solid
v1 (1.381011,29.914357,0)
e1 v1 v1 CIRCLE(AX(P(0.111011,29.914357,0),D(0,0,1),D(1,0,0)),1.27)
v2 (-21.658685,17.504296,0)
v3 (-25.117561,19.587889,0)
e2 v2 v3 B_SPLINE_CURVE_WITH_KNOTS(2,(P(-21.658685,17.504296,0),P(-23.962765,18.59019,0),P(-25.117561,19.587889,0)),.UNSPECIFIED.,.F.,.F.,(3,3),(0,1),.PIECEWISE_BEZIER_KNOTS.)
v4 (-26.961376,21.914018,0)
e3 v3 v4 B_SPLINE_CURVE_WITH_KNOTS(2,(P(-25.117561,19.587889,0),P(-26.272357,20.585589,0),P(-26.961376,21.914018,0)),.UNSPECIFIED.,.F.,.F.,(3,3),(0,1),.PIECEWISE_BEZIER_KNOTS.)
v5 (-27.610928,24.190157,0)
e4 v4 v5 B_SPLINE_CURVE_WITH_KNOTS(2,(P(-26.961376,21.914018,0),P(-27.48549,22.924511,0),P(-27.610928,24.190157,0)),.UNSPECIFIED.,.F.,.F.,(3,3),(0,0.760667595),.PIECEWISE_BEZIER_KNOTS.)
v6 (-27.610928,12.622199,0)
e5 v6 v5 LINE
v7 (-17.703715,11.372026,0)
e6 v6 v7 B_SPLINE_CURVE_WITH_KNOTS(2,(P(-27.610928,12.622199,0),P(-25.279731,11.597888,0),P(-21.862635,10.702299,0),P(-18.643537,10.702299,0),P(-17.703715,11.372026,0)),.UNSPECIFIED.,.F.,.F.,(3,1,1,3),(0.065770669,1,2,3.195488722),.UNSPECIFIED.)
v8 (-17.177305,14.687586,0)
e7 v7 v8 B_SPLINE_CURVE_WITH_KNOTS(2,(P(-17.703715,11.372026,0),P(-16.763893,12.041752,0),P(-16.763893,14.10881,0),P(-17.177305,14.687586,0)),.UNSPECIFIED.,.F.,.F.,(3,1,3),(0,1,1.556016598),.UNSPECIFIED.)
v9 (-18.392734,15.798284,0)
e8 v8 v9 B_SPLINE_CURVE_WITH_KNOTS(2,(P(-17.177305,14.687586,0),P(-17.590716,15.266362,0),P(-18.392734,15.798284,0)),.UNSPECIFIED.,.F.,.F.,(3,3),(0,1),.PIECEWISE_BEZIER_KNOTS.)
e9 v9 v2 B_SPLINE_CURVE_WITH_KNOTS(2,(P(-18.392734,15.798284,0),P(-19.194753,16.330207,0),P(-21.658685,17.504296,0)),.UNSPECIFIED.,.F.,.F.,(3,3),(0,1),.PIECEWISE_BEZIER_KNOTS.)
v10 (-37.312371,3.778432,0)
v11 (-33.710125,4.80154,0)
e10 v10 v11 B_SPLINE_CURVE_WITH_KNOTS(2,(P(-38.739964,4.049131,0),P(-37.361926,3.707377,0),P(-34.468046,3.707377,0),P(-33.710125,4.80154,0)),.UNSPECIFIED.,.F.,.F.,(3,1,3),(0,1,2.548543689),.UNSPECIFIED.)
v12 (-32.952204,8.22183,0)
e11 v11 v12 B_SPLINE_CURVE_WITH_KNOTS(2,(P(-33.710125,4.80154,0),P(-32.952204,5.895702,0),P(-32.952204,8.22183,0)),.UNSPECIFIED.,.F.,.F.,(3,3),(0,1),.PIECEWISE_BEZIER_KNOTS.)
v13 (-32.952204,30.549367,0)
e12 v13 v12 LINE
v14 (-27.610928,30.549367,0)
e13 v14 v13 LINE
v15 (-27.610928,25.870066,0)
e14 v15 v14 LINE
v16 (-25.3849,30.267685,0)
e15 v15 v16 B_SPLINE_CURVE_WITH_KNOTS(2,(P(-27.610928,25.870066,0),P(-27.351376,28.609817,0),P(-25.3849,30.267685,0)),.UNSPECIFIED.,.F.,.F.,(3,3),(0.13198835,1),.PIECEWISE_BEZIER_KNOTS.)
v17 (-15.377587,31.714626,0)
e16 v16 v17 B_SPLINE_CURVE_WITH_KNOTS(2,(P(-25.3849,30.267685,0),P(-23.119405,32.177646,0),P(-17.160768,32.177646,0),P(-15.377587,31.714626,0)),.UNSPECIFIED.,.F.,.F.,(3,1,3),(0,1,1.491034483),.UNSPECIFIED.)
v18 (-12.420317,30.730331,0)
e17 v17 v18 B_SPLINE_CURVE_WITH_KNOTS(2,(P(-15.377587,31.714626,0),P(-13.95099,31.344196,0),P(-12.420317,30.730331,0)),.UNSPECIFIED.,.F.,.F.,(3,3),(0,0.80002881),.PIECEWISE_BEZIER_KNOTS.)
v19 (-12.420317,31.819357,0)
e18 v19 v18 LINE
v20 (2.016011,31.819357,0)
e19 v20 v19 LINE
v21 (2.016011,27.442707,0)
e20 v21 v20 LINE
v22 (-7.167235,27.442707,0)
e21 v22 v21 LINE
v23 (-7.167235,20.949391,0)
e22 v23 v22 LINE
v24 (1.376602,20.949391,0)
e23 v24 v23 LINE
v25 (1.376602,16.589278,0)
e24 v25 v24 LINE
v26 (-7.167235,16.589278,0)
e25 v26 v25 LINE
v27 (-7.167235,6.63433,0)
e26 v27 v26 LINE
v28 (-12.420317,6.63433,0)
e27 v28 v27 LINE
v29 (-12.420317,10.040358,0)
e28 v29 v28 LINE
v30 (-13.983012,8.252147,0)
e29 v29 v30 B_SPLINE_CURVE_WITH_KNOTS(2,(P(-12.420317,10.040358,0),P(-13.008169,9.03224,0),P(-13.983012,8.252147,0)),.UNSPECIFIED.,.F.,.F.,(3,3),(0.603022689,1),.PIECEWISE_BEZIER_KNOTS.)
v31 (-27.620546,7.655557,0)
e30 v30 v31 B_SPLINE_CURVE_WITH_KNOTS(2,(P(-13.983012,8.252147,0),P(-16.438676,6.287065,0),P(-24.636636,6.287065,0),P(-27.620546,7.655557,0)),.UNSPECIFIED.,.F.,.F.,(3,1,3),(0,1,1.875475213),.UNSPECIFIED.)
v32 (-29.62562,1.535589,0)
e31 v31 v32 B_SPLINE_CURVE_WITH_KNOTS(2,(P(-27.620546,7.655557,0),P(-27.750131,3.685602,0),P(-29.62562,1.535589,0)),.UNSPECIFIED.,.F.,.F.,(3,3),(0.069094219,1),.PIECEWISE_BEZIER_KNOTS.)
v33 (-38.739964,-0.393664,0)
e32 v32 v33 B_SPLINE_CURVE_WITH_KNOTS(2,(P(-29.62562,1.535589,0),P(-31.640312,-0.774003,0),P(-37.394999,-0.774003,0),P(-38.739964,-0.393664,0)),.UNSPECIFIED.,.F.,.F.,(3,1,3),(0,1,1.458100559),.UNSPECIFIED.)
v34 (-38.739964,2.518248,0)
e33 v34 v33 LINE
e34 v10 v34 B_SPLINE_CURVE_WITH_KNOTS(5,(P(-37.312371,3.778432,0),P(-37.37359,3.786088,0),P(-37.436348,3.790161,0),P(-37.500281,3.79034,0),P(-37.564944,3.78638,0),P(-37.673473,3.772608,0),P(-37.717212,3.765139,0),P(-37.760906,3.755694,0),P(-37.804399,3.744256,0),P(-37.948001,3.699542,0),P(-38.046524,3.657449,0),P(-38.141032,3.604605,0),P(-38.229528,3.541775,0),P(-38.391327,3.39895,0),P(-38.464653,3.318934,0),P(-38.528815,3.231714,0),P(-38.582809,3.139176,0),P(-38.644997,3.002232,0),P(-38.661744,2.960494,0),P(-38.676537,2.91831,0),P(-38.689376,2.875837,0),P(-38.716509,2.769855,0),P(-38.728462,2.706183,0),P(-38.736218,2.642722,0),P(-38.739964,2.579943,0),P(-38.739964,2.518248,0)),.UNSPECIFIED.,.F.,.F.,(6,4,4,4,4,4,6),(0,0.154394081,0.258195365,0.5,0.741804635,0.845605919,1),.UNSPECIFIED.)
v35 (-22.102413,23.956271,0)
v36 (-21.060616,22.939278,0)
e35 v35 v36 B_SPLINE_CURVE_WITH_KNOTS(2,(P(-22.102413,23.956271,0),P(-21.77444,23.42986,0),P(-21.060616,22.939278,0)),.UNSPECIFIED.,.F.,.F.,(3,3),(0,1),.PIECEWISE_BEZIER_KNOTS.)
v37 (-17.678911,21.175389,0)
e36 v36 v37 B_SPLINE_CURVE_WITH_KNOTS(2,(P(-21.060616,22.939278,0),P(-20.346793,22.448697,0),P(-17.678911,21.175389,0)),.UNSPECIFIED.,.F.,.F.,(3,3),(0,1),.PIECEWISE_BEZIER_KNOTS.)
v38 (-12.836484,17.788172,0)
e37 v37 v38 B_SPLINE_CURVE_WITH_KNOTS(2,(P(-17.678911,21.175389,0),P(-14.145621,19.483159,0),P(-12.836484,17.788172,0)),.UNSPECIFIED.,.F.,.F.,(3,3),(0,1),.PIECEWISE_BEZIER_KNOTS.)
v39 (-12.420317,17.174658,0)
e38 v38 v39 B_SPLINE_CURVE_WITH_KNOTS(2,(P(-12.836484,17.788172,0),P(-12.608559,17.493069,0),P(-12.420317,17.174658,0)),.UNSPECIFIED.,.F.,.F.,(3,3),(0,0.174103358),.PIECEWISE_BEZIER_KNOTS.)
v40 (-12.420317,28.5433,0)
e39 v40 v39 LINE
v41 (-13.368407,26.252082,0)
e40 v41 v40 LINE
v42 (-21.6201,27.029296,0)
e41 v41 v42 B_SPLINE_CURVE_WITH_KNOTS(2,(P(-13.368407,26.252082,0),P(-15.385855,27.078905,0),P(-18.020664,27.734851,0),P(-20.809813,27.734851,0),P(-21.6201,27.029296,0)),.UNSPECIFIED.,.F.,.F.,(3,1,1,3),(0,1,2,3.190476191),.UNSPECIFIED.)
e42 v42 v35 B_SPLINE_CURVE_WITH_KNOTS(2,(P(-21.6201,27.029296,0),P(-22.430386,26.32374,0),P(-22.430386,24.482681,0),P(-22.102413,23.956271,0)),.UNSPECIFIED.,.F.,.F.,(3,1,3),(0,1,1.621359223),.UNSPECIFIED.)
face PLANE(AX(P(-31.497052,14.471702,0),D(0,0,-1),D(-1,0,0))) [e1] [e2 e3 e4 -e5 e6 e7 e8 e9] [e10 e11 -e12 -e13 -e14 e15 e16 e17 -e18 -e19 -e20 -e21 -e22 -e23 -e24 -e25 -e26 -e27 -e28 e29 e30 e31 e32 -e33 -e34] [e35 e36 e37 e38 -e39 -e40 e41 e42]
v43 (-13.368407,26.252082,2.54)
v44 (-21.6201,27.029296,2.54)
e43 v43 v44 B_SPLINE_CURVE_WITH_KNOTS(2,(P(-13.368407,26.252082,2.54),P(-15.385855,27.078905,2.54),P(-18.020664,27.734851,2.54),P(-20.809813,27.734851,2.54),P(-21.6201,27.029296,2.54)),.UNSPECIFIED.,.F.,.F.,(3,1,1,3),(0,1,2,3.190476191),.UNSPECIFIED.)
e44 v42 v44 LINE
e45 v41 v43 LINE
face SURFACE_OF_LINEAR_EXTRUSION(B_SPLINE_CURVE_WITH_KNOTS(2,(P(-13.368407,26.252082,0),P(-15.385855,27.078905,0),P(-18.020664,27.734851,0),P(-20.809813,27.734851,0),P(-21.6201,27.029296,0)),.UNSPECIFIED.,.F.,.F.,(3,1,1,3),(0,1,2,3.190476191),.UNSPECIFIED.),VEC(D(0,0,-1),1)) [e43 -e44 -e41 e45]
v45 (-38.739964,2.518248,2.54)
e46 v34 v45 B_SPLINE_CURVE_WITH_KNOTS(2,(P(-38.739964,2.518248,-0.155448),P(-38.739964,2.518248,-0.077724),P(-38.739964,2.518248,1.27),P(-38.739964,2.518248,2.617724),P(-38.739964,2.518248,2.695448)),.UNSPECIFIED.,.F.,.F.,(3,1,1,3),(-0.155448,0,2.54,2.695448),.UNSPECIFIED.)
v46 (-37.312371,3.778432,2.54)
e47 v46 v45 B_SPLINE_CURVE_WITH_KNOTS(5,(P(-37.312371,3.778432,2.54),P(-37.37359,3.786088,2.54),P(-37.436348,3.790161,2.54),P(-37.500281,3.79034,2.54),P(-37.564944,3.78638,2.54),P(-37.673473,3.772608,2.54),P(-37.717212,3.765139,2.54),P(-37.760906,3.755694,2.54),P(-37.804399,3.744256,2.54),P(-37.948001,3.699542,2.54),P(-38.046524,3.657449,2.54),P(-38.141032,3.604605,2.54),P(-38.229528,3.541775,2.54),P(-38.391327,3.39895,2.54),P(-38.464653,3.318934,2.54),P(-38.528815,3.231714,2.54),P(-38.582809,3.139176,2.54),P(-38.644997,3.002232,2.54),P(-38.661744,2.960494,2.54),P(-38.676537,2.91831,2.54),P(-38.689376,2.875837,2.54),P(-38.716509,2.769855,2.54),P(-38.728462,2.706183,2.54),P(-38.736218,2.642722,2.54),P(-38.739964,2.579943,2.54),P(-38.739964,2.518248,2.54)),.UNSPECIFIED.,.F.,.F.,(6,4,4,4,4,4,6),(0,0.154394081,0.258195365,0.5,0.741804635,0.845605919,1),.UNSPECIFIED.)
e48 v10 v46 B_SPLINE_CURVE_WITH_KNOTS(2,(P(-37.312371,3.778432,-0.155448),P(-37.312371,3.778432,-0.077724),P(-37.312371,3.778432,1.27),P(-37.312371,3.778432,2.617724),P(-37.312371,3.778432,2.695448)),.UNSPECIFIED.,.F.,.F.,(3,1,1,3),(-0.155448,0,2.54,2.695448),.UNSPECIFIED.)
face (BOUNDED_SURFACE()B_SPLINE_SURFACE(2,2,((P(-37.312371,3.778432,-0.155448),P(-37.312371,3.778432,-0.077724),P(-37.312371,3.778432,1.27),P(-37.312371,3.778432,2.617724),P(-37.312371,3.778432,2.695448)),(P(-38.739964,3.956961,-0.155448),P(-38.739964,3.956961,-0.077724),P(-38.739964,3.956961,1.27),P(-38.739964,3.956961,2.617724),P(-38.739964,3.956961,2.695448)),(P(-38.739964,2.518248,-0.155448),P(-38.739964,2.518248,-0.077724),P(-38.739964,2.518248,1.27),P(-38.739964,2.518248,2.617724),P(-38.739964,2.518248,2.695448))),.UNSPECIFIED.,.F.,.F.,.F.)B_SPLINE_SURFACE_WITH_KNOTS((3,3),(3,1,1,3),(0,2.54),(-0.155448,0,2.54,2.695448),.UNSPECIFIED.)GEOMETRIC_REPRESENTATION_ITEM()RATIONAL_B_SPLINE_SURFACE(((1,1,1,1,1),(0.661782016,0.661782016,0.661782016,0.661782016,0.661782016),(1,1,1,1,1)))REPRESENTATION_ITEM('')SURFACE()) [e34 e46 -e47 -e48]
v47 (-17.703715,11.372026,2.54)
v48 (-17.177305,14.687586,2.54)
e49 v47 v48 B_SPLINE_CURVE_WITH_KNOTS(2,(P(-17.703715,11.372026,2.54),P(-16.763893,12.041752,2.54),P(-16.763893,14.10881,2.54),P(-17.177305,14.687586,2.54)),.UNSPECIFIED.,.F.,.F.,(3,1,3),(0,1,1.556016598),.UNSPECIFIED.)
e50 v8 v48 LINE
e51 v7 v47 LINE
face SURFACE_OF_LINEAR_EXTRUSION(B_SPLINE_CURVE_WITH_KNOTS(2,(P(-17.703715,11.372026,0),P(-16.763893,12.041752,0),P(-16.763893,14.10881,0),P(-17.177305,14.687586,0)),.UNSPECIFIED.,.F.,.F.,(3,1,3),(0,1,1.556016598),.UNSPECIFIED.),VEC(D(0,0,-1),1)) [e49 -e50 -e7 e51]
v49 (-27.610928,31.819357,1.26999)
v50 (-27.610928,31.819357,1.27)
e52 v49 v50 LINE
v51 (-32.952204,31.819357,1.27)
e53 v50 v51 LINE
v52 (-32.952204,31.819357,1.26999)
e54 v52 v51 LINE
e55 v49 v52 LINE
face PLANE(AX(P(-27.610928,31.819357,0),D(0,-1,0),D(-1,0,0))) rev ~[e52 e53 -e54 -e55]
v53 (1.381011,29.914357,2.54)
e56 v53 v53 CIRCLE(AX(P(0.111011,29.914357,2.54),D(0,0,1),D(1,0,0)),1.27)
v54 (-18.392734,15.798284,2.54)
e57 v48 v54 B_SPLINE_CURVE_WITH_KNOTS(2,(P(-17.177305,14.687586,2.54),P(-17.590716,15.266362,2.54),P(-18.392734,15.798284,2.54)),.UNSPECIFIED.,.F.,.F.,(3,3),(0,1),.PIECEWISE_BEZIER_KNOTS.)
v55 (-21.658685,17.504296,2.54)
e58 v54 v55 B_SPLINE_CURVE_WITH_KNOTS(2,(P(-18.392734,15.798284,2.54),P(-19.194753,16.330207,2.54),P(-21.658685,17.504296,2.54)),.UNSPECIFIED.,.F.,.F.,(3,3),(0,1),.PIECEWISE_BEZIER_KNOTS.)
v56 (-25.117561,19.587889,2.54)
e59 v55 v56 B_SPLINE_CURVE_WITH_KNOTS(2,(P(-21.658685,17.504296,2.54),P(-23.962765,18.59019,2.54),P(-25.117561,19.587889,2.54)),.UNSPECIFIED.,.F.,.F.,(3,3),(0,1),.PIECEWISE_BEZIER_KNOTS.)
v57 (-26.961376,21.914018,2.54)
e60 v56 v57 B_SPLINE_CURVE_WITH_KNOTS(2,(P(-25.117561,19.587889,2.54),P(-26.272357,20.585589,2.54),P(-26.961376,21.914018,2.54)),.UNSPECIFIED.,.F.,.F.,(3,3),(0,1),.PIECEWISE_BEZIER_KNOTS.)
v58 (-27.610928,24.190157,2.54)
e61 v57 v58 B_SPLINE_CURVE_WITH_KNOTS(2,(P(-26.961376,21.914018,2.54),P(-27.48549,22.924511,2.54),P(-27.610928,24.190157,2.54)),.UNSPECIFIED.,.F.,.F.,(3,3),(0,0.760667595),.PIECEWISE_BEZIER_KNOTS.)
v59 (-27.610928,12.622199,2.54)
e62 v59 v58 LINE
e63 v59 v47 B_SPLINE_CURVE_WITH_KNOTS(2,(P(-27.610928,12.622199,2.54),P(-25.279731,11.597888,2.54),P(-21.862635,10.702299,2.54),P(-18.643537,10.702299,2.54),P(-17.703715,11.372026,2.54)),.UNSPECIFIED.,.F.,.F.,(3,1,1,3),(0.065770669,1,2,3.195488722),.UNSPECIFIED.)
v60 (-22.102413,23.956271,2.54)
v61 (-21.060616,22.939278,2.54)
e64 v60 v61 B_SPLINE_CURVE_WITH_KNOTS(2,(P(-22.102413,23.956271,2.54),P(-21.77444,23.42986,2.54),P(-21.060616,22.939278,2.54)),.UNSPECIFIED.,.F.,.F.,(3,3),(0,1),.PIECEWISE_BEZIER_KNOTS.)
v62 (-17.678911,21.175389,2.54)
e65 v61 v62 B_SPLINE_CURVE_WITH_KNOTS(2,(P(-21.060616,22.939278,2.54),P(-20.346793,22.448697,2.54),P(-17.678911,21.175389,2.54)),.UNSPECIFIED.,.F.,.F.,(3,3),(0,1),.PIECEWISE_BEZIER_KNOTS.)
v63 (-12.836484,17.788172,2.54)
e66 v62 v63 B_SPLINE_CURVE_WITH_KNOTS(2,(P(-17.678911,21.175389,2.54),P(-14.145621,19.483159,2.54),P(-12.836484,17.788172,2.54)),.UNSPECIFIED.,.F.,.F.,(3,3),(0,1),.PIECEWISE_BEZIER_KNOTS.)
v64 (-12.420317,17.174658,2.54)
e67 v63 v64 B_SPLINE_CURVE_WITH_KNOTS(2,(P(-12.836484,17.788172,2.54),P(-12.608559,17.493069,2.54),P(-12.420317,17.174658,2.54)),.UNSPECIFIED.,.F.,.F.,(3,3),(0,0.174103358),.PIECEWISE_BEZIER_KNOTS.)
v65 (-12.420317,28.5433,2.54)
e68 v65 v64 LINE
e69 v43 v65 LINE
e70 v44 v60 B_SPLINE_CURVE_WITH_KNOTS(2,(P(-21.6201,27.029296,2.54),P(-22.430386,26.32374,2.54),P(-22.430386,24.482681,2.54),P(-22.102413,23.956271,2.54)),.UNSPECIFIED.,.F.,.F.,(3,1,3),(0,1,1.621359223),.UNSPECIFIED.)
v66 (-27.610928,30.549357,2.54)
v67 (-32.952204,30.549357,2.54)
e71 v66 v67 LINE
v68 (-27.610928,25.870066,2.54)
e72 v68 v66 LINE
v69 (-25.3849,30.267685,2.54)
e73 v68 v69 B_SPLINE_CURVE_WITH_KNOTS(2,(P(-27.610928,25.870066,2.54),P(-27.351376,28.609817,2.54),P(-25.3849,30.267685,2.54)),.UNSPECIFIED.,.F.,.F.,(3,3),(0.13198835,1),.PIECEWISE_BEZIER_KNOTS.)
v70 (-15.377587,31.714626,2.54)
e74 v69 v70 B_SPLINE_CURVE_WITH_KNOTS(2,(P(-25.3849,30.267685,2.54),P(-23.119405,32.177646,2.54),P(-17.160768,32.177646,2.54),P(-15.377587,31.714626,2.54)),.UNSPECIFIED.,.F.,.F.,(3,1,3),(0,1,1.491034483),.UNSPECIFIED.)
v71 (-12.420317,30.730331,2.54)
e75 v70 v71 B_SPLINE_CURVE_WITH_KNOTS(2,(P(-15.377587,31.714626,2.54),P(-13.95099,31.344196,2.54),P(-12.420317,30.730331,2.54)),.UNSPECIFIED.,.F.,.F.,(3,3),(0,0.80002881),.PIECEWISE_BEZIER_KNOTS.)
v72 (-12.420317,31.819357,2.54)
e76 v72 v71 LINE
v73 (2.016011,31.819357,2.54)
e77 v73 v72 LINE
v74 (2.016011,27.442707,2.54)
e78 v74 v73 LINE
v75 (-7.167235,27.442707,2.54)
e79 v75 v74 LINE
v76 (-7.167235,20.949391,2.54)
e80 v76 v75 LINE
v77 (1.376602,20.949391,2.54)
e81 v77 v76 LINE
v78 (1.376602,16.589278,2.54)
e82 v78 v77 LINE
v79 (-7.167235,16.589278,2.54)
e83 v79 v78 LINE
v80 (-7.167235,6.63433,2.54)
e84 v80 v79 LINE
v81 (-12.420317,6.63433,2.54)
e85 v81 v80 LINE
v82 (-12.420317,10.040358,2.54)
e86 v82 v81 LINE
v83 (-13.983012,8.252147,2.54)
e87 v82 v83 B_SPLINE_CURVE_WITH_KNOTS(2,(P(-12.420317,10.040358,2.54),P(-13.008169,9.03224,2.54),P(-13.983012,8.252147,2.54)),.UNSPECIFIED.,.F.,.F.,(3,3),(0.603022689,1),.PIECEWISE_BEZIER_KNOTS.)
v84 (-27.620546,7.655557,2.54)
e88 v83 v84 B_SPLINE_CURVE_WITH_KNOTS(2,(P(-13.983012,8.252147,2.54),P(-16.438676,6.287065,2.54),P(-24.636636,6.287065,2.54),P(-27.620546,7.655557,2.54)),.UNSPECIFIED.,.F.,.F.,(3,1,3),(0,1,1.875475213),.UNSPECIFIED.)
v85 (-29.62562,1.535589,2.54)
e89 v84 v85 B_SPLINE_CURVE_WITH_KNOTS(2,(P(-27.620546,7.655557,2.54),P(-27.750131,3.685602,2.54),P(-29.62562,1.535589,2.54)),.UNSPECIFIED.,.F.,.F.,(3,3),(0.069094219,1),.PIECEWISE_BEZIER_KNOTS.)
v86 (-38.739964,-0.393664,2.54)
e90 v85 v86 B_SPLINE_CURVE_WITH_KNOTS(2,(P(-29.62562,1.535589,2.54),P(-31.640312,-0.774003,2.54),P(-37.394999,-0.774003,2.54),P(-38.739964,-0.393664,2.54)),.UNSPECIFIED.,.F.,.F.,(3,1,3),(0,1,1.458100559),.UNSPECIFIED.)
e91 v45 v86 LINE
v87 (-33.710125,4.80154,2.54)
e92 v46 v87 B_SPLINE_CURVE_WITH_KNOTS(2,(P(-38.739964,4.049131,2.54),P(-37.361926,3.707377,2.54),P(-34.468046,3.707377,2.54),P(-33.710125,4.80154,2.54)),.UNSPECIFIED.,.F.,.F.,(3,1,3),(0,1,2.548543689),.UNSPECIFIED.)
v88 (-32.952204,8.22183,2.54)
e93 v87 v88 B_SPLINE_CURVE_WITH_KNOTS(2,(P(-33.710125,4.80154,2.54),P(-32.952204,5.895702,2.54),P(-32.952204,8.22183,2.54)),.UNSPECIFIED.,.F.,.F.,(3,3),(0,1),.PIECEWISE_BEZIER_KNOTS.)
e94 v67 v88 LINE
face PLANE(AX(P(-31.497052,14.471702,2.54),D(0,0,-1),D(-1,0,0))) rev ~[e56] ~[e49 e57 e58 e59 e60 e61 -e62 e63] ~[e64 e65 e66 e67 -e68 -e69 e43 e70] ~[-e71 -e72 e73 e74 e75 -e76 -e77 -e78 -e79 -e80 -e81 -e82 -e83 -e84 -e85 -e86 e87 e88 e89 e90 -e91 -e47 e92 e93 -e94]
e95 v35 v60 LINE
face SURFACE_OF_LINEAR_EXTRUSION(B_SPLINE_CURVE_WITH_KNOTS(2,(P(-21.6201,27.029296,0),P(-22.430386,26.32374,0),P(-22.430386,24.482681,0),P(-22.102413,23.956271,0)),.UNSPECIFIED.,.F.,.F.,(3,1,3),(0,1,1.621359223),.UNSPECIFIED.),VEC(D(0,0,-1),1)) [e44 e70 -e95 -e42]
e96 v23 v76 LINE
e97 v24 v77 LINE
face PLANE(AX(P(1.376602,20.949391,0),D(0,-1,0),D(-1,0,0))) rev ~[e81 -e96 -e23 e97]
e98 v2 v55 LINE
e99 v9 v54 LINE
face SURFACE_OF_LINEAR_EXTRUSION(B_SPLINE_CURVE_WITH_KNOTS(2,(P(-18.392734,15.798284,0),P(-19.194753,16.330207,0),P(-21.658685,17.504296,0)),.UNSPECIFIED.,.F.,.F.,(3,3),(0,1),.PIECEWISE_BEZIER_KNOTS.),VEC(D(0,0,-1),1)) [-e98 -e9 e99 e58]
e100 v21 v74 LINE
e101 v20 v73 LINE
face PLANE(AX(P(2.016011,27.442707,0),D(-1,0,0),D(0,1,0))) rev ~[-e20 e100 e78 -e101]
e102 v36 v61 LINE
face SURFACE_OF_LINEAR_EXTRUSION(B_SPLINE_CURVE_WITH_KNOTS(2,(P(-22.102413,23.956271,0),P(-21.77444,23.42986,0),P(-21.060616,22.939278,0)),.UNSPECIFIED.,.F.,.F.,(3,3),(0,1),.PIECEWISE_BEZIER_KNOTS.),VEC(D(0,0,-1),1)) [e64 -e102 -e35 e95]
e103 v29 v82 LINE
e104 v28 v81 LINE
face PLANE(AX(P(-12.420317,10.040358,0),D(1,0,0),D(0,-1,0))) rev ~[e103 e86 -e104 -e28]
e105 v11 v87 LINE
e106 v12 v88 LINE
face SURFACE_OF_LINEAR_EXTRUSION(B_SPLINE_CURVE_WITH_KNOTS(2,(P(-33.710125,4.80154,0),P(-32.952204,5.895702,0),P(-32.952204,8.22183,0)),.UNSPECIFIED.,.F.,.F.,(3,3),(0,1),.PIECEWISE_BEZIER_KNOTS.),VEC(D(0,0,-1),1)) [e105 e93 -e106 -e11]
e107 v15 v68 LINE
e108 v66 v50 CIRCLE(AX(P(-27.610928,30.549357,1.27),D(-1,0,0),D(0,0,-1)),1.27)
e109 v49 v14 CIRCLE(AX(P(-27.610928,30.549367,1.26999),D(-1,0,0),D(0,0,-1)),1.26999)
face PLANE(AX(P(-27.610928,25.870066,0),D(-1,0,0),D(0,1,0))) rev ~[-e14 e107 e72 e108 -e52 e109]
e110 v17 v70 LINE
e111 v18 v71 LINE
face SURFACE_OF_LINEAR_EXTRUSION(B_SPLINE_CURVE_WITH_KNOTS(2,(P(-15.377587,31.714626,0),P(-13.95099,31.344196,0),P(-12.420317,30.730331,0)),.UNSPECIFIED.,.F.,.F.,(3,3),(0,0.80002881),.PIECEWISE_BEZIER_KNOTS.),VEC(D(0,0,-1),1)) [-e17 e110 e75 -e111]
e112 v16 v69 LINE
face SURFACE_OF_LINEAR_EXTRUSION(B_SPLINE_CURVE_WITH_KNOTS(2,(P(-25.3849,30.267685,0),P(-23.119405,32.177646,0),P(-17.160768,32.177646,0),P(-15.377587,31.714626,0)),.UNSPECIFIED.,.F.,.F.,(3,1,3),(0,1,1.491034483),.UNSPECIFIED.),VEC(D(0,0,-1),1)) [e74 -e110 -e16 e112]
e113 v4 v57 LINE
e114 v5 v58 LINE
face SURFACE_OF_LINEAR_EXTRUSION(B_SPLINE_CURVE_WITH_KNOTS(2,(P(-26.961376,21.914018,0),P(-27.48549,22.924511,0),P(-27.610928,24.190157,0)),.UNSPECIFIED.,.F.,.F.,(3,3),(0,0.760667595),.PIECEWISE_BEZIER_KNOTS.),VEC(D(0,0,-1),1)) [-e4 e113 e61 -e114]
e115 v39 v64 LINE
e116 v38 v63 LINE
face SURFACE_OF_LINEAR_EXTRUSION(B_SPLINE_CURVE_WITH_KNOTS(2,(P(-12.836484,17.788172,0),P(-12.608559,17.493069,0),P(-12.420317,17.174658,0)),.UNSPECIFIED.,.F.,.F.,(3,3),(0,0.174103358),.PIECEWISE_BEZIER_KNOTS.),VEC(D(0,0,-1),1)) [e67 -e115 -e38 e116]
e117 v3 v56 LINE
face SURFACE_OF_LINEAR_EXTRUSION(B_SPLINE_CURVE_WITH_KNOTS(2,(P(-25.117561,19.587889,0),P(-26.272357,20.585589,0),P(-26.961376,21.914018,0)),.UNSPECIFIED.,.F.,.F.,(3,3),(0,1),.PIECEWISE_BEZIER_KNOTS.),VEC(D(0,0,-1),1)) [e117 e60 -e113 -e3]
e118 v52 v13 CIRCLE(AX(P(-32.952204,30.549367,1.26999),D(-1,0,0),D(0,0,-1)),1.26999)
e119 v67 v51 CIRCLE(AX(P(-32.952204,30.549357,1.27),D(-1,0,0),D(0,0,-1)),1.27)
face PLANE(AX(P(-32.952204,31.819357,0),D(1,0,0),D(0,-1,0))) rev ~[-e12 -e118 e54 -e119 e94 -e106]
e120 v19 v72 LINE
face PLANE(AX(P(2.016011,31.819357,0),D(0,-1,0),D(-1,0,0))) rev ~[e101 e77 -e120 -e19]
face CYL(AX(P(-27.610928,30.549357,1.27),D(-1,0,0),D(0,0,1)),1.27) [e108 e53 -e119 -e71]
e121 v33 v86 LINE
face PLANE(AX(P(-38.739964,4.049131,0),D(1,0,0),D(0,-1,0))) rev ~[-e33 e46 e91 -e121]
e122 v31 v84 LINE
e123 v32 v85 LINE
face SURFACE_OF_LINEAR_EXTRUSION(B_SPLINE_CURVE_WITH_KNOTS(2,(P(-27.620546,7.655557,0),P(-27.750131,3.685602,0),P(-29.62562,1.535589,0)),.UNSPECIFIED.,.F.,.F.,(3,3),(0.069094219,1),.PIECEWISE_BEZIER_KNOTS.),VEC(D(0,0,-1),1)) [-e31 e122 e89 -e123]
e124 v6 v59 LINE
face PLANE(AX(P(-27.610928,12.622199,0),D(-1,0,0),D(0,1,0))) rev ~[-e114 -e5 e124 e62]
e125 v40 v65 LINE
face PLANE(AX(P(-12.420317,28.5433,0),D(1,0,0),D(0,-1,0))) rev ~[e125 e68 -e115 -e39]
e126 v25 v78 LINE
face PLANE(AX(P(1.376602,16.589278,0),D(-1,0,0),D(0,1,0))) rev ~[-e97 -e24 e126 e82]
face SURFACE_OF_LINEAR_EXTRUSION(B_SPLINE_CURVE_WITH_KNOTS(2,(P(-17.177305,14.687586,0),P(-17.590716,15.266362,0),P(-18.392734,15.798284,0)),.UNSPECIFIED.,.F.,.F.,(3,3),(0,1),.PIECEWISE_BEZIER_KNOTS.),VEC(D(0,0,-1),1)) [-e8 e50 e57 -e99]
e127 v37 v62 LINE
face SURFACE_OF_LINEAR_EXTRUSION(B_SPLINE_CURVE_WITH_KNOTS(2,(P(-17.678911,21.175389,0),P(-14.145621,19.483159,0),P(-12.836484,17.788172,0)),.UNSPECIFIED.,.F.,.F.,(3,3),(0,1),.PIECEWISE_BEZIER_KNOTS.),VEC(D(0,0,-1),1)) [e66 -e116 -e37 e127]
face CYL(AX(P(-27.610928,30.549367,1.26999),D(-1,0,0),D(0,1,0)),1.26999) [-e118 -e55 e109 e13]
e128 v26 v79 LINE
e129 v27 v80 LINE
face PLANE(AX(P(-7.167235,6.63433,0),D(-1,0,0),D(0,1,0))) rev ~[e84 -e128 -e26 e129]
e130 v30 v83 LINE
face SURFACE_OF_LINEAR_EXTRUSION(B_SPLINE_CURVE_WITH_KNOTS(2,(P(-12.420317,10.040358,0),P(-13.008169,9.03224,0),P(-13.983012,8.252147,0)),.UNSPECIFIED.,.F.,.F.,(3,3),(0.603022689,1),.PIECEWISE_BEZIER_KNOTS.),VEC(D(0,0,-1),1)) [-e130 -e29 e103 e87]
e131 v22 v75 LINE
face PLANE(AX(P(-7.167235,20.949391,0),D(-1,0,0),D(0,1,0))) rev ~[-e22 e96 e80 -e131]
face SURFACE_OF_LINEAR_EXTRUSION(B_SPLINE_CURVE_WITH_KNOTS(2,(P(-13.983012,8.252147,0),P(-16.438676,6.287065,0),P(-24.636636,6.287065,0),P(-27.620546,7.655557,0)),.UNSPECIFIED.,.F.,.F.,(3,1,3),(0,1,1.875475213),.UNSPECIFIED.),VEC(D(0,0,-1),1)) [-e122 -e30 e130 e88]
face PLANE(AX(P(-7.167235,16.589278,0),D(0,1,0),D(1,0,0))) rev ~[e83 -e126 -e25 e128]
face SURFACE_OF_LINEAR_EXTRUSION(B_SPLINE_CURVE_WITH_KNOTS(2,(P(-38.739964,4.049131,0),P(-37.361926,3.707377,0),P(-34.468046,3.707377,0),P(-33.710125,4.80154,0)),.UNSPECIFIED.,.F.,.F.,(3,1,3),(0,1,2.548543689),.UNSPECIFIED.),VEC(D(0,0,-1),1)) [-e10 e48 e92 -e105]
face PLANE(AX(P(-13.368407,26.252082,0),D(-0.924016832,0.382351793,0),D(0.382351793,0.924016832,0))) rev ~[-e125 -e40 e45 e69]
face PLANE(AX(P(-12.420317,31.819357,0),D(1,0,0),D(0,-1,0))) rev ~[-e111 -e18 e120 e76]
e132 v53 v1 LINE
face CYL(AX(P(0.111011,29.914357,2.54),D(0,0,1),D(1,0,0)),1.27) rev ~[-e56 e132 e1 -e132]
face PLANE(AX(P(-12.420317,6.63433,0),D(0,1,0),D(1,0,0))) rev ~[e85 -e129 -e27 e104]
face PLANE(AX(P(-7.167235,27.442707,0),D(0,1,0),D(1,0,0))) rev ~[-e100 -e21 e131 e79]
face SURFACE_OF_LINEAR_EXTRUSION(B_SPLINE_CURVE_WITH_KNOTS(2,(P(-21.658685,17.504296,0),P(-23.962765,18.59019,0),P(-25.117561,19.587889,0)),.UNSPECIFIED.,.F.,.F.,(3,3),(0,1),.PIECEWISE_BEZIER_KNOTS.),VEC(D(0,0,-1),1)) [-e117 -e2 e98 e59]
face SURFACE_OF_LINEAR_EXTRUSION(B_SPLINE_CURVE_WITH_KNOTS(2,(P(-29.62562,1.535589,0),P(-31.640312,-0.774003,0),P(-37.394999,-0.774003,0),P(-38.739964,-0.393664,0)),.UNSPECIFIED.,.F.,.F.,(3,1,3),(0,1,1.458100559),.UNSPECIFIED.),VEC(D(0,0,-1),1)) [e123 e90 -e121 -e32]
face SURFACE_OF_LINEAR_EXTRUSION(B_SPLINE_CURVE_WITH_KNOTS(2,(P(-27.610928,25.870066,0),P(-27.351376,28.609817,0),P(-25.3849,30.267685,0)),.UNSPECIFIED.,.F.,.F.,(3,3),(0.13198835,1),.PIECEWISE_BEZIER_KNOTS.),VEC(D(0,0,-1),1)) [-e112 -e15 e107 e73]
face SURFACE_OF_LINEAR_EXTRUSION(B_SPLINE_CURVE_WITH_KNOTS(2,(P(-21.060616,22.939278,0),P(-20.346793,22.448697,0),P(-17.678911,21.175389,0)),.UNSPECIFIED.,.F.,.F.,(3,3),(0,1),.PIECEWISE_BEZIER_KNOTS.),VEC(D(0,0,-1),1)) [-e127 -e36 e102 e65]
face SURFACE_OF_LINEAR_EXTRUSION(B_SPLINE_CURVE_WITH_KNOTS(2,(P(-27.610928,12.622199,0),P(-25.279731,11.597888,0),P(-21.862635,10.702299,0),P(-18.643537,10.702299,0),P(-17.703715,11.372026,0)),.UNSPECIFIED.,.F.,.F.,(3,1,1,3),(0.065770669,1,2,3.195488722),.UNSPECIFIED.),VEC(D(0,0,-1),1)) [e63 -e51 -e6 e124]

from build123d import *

# Parameters (mm, degrees)
F1_DEPTH = 2.54
F2_R     = 1.27
F3_DEPTH = 25.4
F4_R     = 1.27
F5_R     = 1.26999
F6_R     = 1.27


# Not quite as in the source:
# - a fillet or chamfer is up to 0.001 mm smaller than in the source, because OpenCascade refuses the exact size


with BuildPart() as f1:
    # F0 (on Top) → F1 (new body)
    with BuildSketch(Plane.XY):
        with BuildLine():
            add(Edge.make_bspline(
                [(-35.5870129937, -0.7740028705), (-37.3949991048, -0.7740028705), (-38.7399643826, -0.3936643288)],
                knots=[0, 0, 0, 1, 1, 1], degree=2))
            add(Edge.make_bspline(
                [(-29.6256197645, 1.5355891434), (-31.6403116048, -0.7740028705), (-35.5870129937, -0.7740028705)],
                knots=[0, 0, 0, 1, 1, 1], degree=2))
            add(Edge.make_bspline(
                [(-27.6205460855, 7.6555567964), (-27.750131484, 3.6856017003), (-29.6256197645, 1.5355891434)],
                knots=[0.0690942193, 0.0690942193, 0.0690942193, 1, 1, 1], degree=2))
            add(Edge.make_bspline(
                [(-27.6205460855, 7.6555567964), (-27.7827885359, 7.7299650226), (-27.9425390354, 7.8084190045)],
                knots=[0.9484314806, 0.9484314806, 0.9484314806, 1, 1, 1], degree=2))
            Line((-27.9425390354, 7.8084190045), (-27.9425390354, 12.7693565045))
            add(Edge.make_bspline(
                [(-27.9425390354, 12.7693565045), (-27.775046491, 12.6943111437), (-27.6109279243, 12.6221986399)],
                knots=[0, 0, 0, 0.0657706688, 0.0657706688, 0.0657706688], degree=2))
            Line((-27.6109279243, 12.6221986399), (-27.6109279243, 24.1901567001))
            add(Edge.make_bspline(
                [(-27.6109279243, 24.1901567001), (-27.6503949382, 24.5883728176), (-27.6503949382, 25.011847824)],
                knots=[0.7606675952, 0.7606675952, 0.7606675952, 1, 1, 1], degree=2))
            add(Edge.make_bspline(
                [(-27.6503949382, 25.011847824), (-27.6503949382, 25.4534645742), (-27.6109279243, 25.8700663435)],
                knots=[0, 0, 0, 0.1319883501, 0.1319883501, 0.1319883501], degree=2))
            Line((-27.6109279243, 25.8700663435), (-27.6109279243, 31.8193565045))
            Line((-27.6109279243, 31.8193565045), (-32.9522039659, 31.8193565045))
            Line((-32.9522039659, 31.8193565045), (-32.9522039659, 8.2218304629))
            add(Edge.make_bspline(
                [(-33.7101249729, 4.8015396643), (-32.9522039659, 5.8957019906), (-32.9522039659, 8.2218304629)],
                knots=[0, 0, 0, 1, 1, 1], degree=2))
            add(Edge.make_bspline(
                [(-36.2264227159, 3.7073773379), (-34.4680459798, 3.7073773379), (-33.7101249729, 4.8015396643)],
                knots=[0, 0, 0, 1, 1, 1], degree=2))
            add(Edge.make_bspline(
                [(-38.7399643826, 4.0491308101), (-37.3619261882, 3.7073773379), (-36.2264227159, 3.7073773379)],
                knots=[0, 0, 0, 1, 1, 1], degree=2))
            Line((-38.7399643826, 4.0491308101), (-38.7399643826, -0.3936643288))
        make_face()
        with BuildLine():
            add(Edge.make_bspline(
                [(-27.6205460855, 7.6555567964), (-27.7827885359, 7.7299650226), (-27.9425390354, 7.8084190045)],
                knots=[0.9484314806, 0.9484314806, 0.9484314806, 1, 1, 1], degree=2))
            add(Edge.make_bspline(
                [(-27.6109279243, 8.2549033795), (-27.6109279243, 7.9502170655), (-27.6205460855, 7.6555567964)],
                knots=[0, 0, 0, 0.0690942193, 0.0690942193, 0.0690942193], degree=2))
            Line((-27.6109279243, 8.2549033795), (-27.6109279243, 12.6221986399))
            add(Edge.make_bspline(
                [(-27.9425390354, 12.7693565045), (-27.775046491, 12.6943111437), (-27.6109279243, 12.6221986399)],
                knots=[0, 0, 0, 0.0657706688, 0.0657706688, 0.0657706688], degree=2))
            Line((-27.9425390354, 12.7693565045), (-27.9425390354, 7.8084190045))
        make_face()
        with BuildLine():
            add(Edge.make_bspline(
                [(-27.6109279243, 8.2549033795), (-27.6109279243, 7.9502170655), (-27.6205460855, 7.6555567964)],
                knots=[0, 0, 0, 0.0690942193, 0.0690942193, 0.0690942193], degree=2))
            add(Edge.make_bspline(
                [(-20.8098133409, 6.2870648379), (-24.63663557, 6.2870648379), (-27.6205460855, 7.6555567964)],
                knots=[0, 0, 0, 0.9484314806, 0.9484314806, 0.9484314806], degree=2))
            add(Edge.make_bspline(
                [(-13.9830121257, 8.2521473031), (-16.4386761882, 6.2870648379), (-20.8098133409, 6.2870648379)],
                knots=[0, 0, 0, 1, 1, 1], degree=2))
            add(Edge.make_bspline(
                [(-12.4203168132, 10.0403583252), (-13.0081692098, 9.0322404558), (-13.9830121257, 8.2521473031)],
                knots=[0.6030226892, 0.6030226892, 0.6030226892, 1, 1, 1], degree=2))
            Line((-12.4203168132, 10.0403583252), (-12.4203168132, 17.1746575044))
            add(Edge.make_bspline(
                [(-12.8364843479, 17.7881716087), (-12.6085593245, 17.4930686838), (-12.4203168132, 17.1746575044)],
                knots=[0, 0, 0, 0.1741033581, 0.1741033581, 0.1741033581], degree=2))
            add(Edge.make_bspline(
                [(-17.6789105632, 21.1753894906), (-14.1456206326, 19.4831585879), (-12.8364843479, 17.7881716087)],
                knots=[0, 0, 0, 1, 1, 1], degree=2))
            add(Edge.make_bspline(
                [(-21.0606162923, 22.9392783795), (-20.3467925076, 22.4486967823), (-17.6789105632, 21.1753894906)],
                knots=[0, 0, 0, 1, 1, 1], degree=2))
            add(Edge.make_bspline(
                [(-22.1024131673, 23.956270567), (-21.774440077, 23.4298599768), (-21.0606162923, 22.9392783795)],
                knots=[0, 0, 0, 1, 1, 1], degree=2))
            add(Edge.make_bspline(
                [(-22.4303862576, 25.1882367129), (-22.4303862576, 24.4826811573), (-22.1024131673, 23.956270567)],
                knots=[0, 0, 0, 1, 1, 1], degree=2))
            add(Edge.make_bspline(
                [(-21.6200997993, 27.0292957406), (-22.4303862576, 26.3237401851), (-22.4303862576, 25.1882367129)],
                knots=[0, 0, 0, 1, 1, 1], degree=2))
            add(Edge.make_bspline(
                [(-19.293971327, 27.7348512962), (-20.8098133409, 27.7348512962), (-21.6200997993, 27.0292957406)],
                knots=[0, 0, 0, 1, 1, 1], degree=2))
            add(Edge.make_bspline(
                [(-16.7032595215, 27.4068782059), (-18.0206640354, 27.7348512962), (-19.293971327, 27.7348512962)],
                knots=[0, 0, 0, 1, 1, 1], degree=2))
            add(Edge.make_bspline(
                [(-13.3684070909, 26.252082199), (-15.3858550076, 27.0789051156), (-16.7032595215, 27.4068782059)],
                knots=[0, 0, 0, 1, 1, 1], degree=2))
            Line((-13.3684070909, 26.252082199), (-12.4203168132, 28.5433003703))
            Line((-12.4203168132, 28.5433003703), (-12.4203168132, 30.7303313899))
            add(Edge.make_bspline(
                [(-15.3775867784, 31.7146256018), (-13.9509902659, 31.3441955954), (-12.4203168132, 30.7303313899)],
                knots=[0, 0, 0, 0.8000288101, 0.8000288101, 0.8000288101], degree=2))
            add(Edge.make_bspline(
                [(-19.1230945909, 32.1776464351), (-17.160768202, 32.1776464351), (-15.3775867784, 31.7146256018)],
                knots=[0, 0, 0, 1, 1, 1], degree=2))
            add(Edge.make_bspline(
                [(-25.3849001465, 30.2676854976), (-23.1194053548, 32.1776464351), (-19.1230945909, 32.1776464351)],
                knots=[0, 0, 0, 1, 1, 1], degree=2))
            add(Edge.make_bspline(
                [(-27.6109279243, 25.8700663435), (-27.3513760183, 28.6098171531), (-25.3849001465, 30.2676854976)],
                knots=[0.1319883501, 0.1319883501, 0.1319883501, 1, 1, 1], degree=2))
            Line((-27.6109279243, 25.8700663435), (-27.6109279243, 24.1901567001))
            add(Edge.make_bspline(
                [(-26.9613758409, 21.9140179629), (-27.4854903406, 22.9245107183), (-27.6109279243, 24.1901567001)],
                knots=[0, 0, 0, 0.7606675952, 0.7606675952, 0.7606675952], degree=2))
            add(Edge.make_bspline(
                [(-25.1175607368, 19.5878894906), (-26.2723567437, 20.5855891434), (-26.9613758409, 21.9140179629)],
                knots=[0, 0, 0, 1, 1, 1], degree=2))
            add(Edge.make_bspline(
                [(-21.6586848687, 17.5042957406), (-23.9627647298, 18.5901898379), (-25.1175607368, 19.5878894906)],
                knots=[0, 0, 0, 1, 1, 1], degree=2))
            add(Edge.make_bspline(
                [(-18.3927343479, 15.7982844559), (-19.194752577, 16.330207199), (-21.6586848687, 17.5042957406)],
                knots=[0, 0, 0, 1, 1, 1], degree=2))
            add(Edge.make_bspline(
                [(-17.1773046604, 14.6875856712), (-17.5907161187, 15.2663617129), (-18.3927343479, 15.7982844559)],
                knots=[0, 0, 0, 1, 1, 1], degree=2))
            add(Edge.make_bspline(
                [(-16.763893202, 13.3701811573), (-16.763893202, 14.1088096295), (-17.1773046604, 14.6875856712)],
                knots=[0, 0, 0, 1, 1, 1], degree=2))
            add(Edge.make_bspline(
                [(-17.7037152507, 11.3720257754), (-16.763893202, 12.0417523379), (-16.763893202, 13.3701811573)],
                knots=[0, 0, 0, 1, 1, 1], degree=2))
            add(Edge.make_bspline(
                [(-20.3964018826, 10.7022992129), (-18.6435372993, 10.7022992129), (-17.7037152507, 11.3720257754)],
                knots=[0, 0, 0, 1, 1, 1], degree=2))
            add(Edge.make_bspline(
                [(-23.6292794868, 11.1653200462), (-21.8626345215, 10.7022992129), (-20.3964018826, 10.7022992129)],
                knots=[0, 0, 0, 1, 1, 1], degree=2))
            add(Edge.make_bspline(
                [(-27.6109279243, 12.6221986399), (-25.2797310311, 11.5978876896), (-23.6292794868, 11.1653200462)],
                knots=[0.0657706688, 0.0657706688, 0.0657706688, 1, 1, 1], degree=2))
            Line((-27.6109279243, 12.6221986399), (-27.6109279243, 8.2549033795))
        make_face()
        with BuildLine():
            add(Edge.make_bspline(
                [(-27.6109279243, 24.1901567001), (-27.6503949382, 24.5883728176), (-27.6503949382, 25.011847824)],
                knots=[0.7606675952, 0.7606675952, 0.7606675952, 1, 1, 1], degree=2))
            Line((-27.6109279243, 24.1901567001), (-27.6109279243, 25.8700663435))
            add(Edge.make_bspline(
                [(-27.6503949382, 25.011847824), (-27.6503949382, 25.4534645742), (-27.6109279243, 25.8700663435)],
                knots=[0, 0, 0, 0.1319883501, 0.1319883501, 0.1319883501], degree=2))
        make_face()
        with BuildLine():
            Line((-12.4203168132, 17.1746575044), (-12.4203168132, 10.0403583252))
            add(Edge.make_bspline(
                [(-11.5273480632, 13.6292523379), (-11.5273480632, 11.5717253126), (-12.4203168132, 10.0403583252)],
                knots=[0, 0, 0, 0.6030226892, 0.6030226892, 0.6030226892], degree=2))
            add(Edge.make_bspline(
                [(-12.4203168132, 17.1746575044), (-11.5273480632, 15.6642057435), (-11.5273480632, 13.6292523379)],
                knots=[0.1741033581, 0.1741033581, 0.1741033581, 1, 1, 1], degree=2))
        make_face()
        with BuildLine():
            add(Edge.make_bspline(
                [(-11.5273480632, 13.6292523379), (-11.5273480632, 11.5717253126), (-12.4203168132, 10.0403583252)],
                knots=[0, 0, 0, 0.6030226892, 0.6030226892, 0.6030226892], degree=2))
            Line((-12.4203168132, 10.0403583252), (-12.4203168132, 6.6343304629))
            Line((-12.4203168132, 6.6343304629), (-7.1672352159, 6.6343304629))
            Line((-7.1672352159, 6.6343304629), (-7.1672352159, 16.5892783795))
            Line((-7.1672352159, 16.5892783795), (1.3766015896, 16.5892783795))
            Line((1.3766015896, 16.5892783795), (1.3766015896, 20.9493912268))
            Line((1.3766015896, 20.9493912268), (-7.1672352159, 20.9493912268))
            Line((-7.1672352159, 20.9493912268), (-7.1672352159, 27.442707199))
            Line((-7.1672352159, 27.442707199), (2.0160113118, 27.442707199))
            Line((2.0160113118, 27.442707199), (2.0160113118, 31.8193565045))
            Line((2.0160113118, 31.8193565045), (-12.4203168132, 31.8193565045))
            Line((-12.4203168132, 31.8193565045), (-12.4203168132, 30.7303313899))
            add(Edge.make_bspline(
                [(-12.4203168132, 30.7303313899), (-12.037717352, 30.5768929712), (-11.6486154243, 30.4082453934)],
                knots=[0.8000288101, 0.8000288101, 0.8000288101, 1, 1, 1], degree=2))
            Line((-11.6486154243, 30.4082453934), (-12.4203168132, 28.5433003703))
            Line((-12.4203168132, 28.5433003703), (-12.4203168132, 17.1746575044))
            add(Edge.make_bspline(
                [(-12.4203168132, 17.1746575044), (-11.5273480632, 15.6642057435), (-11.5273480632, 13.6292523379)],
                knots=[0.1741033581, 0.1741033581, 0.1741033581, 1, 1, 1], degree=2))
        make_face()
        with BuildLine():
            Line((-12.4203168132, 30.7303313899), (-12.4203168132, 28.5433003703))
            Line((-12.4203168132, 28.5433003703), (-11.6486154243, 30.4082453934))
            add(Edge.make_bspline(
                [(-12.4203168132, 30.7303313899), (-12.037717352, 30.5768929712), (-11.6486154243, 30.4082453934)],
                knots=[0.8000288101, 0.8000288101, 0.8000288101, 1, 1, 1], degree=2))
        make_face()
    extrude(amount=F1_DEPTH)

    # F2 (on face) → F3 (cut)
    with BuildSketch(Plane.XY.offset(2.54)):
        with Locations((0.1110113118, 29.9143565045)):
            Circle(F2_R)
    extrude(amount=-F3_DEPTH, mode=Mode.SUBTRACT)

    # F4
    f4_edges = [f1.edges().sort_by_distance(p)[0] for p in [
        (-30.281566, 31.819357, 2.54),
    ]]
    fillet(f4_edges, radius=F4_R)

    # F5 (radius 1.27 in the source; OpenCascade refuses exactly that, so slightly less here)
    f5_edges = [f1.edges().sort_by_distance(p)[0] for p in [
        (-30.281566, 31.819357, 0),
    ]]
    fillet(f5_edges, radius=F5_R)

    # F6
    f6_edges = [f1.edges().sort_by_distance(p)[0] for p in [
        (-38.739964, 4.049131, 1.27),
    ]]
    fillet(f6_edges, radius=F6_R)


solid = f1.part
